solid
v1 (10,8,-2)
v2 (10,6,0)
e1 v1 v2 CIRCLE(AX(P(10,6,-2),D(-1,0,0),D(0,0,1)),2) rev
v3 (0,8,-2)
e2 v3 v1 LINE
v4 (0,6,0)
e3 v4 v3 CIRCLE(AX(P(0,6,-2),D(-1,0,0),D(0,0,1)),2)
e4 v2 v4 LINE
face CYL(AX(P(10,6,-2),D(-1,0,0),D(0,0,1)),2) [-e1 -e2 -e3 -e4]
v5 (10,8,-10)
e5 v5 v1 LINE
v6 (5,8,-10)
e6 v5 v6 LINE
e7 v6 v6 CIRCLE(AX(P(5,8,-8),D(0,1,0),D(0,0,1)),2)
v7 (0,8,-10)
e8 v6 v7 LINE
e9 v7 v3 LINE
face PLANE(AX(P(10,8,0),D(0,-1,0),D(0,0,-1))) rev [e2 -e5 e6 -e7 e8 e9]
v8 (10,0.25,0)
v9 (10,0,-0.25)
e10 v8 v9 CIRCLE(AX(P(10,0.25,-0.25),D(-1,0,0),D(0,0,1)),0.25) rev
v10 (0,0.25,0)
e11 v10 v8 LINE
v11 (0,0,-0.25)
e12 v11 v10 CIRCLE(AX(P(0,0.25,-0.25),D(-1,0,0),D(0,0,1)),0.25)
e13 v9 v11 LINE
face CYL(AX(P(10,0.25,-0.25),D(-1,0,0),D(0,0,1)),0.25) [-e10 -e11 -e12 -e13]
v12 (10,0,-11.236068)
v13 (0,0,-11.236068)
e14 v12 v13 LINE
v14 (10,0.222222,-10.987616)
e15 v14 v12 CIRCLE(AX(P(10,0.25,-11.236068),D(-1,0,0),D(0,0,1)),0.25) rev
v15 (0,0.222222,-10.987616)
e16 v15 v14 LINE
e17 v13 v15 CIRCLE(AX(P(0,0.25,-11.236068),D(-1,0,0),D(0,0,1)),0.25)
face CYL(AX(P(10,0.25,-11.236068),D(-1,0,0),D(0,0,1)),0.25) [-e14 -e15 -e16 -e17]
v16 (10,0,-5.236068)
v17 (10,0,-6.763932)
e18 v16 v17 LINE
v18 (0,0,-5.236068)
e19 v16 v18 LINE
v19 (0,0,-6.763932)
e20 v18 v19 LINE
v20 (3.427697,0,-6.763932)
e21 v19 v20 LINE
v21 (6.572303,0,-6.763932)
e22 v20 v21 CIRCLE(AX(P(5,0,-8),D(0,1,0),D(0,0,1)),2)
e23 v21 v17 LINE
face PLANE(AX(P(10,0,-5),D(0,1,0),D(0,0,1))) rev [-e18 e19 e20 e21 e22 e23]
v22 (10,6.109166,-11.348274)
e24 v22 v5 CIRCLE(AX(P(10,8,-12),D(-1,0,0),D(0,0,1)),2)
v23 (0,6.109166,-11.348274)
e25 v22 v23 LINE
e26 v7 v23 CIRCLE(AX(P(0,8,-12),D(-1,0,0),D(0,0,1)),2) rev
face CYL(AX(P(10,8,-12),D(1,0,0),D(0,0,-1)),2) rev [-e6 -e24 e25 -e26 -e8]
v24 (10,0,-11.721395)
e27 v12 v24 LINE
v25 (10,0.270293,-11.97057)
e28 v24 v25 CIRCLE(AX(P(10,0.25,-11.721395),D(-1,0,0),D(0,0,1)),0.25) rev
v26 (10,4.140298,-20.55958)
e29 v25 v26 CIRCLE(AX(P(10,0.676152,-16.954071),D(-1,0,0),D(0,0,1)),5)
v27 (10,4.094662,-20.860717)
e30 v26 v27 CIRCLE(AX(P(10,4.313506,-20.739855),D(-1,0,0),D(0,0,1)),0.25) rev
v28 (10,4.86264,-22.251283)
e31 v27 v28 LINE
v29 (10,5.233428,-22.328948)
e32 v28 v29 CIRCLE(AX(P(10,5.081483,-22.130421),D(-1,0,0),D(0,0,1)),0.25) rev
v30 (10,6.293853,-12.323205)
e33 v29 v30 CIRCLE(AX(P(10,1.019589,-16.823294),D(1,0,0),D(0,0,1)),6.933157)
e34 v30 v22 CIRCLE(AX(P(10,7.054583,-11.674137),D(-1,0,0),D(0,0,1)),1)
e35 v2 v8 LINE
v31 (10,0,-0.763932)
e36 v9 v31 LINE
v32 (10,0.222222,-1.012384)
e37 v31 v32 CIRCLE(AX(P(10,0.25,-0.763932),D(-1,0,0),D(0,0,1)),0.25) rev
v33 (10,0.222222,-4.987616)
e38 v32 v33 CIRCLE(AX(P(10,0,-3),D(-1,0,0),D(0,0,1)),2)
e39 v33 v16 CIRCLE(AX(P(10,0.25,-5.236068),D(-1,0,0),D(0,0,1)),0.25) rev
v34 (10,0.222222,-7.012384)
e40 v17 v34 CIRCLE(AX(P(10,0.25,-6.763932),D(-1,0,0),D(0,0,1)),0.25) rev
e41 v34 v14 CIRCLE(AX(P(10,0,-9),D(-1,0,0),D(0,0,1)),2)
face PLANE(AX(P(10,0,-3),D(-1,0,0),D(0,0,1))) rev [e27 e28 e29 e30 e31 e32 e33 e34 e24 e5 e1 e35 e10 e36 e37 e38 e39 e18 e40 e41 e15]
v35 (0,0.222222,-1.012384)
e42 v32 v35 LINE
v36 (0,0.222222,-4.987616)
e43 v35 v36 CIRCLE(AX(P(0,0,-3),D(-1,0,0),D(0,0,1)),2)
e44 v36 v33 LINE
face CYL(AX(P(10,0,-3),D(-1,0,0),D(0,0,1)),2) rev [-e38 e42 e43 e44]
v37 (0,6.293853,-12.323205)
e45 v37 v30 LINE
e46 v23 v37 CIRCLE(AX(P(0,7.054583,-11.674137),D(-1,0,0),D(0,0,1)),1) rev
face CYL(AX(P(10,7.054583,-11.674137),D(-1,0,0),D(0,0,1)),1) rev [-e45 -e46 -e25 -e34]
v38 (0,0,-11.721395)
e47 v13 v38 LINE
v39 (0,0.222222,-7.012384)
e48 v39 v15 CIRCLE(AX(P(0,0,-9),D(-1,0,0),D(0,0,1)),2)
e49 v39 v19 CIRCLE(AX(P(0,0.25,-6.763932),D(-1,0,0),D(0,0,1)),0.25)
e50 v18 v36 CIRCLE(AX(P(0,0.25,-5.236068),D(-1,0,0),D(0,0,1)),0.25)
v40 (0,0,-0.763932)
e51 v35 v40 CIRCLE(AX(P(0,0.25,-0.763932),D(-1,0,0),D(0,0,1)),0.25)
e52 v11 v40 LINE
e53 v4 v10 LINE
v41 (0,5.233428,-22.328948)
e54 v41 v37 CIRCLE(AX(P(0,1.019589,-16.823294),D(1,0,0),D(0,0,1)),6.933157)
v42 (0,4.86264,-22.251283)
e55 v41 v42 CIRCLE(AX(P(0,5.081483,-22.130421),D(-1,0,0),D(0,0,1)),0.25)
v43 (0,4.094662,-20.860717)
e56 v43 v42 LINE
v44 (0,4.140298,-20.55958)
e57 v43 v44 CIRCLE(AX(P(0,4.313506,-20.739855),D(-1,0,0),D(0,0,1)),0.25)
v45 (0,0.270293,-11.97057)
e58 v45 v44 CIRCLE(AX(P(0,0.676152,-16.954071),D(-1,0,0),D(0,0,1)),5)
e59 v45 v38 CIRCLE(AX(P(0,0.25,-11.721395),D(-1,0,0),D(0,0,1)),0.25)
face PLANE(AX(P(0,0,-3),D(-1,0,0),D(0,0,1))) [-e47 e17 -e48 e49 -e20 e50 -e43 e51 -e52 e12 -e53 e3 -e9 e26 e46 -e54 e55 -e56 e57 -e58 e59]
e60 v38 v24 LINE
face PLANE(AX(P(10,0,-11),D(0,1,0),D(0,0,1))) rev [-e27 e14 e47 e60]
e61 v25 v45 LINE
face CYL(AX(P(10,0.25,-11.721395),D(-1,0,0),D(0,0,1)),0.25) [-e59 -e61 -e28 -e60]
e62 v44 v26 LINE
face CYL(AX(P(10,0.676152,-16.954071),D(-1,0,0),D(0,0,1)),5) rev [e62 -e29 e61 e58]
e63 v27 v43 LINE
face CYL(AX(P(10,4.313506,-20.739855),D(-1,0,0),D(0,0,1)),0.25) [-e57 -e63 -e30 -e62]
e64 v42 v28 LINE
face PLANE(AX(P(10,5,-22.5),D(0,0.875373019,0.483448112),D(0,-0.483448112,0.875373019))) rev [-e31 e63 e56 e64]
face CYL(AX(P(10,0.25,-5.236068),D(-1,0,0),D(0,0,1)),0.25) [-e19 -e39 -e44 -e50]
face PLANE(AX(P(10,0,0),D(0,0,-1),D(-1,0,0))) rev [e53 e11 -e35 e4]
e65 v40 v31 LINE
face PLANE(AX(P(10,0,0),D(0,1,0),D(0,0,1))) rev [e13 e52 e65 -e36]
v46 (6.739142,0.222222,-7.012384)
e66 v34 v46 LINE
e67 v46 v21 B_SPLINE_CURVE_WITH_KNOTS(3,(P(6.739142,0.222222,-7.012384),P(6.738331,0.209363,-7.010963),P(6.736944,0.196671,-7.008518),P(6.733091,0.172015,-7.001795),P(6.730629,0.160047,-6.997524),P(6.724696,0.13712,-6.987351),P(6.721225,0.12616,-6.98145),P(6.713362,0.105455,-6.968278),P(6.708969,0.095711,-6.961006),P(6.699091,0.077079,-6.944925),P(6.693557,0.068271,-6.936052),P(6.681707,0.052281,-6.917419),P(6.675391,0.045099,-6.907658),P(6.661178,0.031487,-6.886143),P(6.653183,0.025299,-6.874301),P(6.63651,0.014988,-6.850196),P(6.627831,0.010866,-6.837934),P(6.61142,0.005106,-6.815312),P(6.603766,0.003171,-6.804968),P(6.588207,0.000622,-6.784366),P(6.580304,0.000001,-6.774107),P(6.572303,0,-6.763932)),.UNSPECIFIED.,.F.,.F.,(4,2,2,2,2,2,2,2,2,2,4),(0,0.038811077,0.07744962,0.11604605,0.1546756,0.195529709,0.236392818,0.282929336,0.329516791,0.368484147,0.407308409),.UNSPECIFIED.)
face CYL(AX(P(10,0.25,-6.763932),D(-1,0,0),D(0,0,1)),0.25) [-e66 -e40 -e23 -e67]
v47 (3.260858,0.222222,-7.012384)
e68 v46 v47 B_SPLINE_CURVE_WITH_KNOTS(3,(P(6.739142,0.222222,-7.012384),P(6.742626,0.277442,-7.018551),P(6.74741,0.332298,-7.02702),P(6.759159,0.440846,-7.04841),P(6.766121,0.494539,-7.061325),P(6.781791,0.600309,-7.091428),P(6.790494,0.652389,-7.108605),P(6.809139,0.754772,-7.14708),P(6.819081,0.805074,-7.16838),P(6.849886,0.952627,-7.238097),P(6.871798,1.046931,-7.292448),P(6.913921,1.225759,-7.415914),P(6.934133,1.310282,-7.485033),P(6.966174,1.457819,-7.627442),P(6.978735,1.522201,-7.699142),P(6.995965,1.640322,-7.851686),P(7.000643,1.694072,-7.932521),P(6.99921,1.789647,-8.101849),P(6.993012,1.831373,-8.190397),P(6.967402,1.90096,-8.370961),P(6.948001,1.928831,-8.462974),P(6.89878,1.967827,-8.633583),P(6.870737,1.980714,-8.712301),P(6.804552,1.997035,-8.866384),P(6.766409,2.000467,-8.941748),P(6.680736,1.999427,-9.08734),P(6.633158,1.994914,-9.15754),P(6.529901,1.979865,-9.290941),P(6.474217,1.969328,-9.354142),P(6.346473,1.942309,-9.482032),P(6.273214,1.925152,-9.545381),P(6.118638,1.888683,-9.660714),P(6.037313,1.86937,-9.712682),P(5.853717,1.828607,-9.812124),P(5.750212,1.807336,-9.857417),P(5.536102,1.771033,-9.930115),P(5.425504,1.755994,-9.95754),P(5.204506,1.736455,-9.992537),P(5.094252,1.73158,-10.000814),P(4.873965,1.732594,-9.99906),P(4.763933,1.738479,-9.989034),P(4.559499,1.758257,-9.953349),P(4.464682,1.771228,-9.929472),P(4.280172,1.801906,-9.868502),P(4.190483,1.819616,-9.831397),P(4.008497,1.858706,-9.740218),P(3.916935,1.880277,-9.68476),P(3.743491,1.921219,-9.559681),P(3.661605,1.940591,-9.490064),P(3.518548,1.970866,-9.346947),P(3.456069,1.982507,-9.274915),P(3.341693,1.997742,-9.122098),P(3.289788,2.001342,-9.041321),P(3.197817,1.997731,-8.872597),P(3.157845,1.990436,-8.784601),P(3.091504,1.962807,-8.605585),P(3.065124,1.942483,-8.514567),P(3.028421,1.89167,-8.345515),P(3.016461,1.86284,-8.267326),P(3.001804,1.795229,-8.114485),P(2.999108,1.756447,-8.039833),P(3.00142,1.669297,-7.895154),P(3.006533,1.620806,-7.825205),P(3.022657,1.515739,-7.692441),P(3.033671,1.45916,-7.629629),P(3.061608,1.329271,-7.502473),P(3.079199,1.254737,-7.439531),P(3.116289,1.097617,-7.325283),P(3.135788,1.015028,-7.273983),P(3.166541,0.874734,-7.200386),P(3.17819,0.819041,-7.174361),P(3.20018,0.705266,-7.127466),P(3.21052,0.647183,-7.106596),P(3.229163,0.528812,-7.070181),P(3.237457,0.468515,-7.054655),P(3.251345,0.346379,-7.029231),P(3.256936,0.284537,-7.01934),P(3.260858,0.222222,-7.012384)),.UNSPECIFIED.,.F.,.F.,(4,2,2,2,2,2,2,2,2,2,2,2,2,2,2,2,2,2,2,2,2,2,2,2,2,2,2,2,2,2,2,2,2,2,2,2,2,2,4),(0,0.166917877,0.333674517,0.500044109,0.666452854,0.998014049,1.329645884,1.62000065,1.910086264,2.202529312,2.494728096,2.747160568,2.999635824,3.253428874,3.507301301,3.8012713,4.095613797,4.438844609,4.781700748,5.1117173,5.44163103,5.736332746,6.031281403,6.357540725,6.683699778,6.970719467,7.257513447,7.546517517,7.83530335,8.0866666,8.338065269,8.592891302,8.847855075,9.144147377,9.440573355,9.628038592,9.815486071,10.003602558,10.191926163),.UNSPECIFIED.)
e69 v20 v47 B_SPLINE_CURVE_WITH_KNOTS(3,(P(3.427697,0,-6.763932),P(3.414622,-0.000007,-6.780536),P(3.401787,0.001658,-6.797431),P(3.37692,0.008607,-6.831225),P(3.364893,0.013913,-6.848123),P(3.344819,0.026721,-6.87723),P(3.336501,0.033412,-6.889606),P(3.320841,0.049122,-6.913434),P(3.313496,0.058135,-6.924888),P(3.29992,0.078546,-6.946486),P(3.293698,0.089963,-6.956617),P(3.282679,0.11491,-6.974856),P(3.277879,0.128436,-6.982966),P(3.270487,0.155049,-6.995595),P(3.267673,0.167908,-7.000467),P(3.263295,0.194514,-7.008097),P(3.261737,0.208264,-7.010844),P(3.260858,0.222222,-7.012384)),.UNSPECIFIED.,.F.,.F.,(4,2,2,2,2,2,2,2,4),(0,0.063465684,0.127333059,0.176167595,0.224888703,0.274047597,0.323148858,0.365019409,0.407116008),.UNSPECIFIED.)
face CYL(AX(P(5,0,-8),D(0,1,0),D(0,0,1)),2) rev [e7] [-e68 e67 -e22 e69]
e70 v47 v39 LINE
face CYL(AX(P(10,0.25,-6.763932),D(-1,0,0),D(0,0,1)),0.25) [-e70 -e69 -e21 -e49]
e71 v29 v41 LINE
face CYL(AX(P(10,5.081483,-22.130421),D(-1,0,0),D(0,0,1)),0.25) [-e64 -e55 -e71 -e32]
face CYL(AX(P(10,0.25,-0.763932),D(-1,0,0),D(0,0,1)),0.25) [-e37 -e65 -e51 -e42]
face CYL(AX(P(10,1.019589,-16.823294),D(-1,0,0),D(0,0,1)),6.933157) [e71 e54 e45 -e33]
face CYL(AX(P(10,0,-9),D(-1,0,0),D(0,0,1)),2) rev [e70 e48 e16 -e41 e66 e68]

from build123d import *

# Parameters (mm, degrees)
BOSS_EXTRUDE1_DEPTH = 10
FILLET1_START       = -1
FILLET1_DEPTH       = 12
FILLET1_2_DEPTH     = 10
FILLET2_R           = 1
FILLET3_R           = 0.25
SKETCH2_R           = 2
CUT_EXTRUDE1_DEPTH  = 26.785330572


with BuildPart() as part:
    # Sketch1 → Boss-Extrude1 (new body)
    with BuildSketch(Plane(origin=(0, 0, 0), x_dir=(0, 0, -1), z_dir=(1, 0, 0))):
        with BuildLine():
            Line((0, 0), (0, 8))
            Line((0, 8), (10, 8))
            Line((10, 8), (10, 6))
            Line((10, 6), (12, 6))
            ThreePointArc((12, 6), (17.480620462, 7.92151485), (22.5, 5))
            Line((22.5, 5), (20.689313396, 4))
            ThreePointArc((20.689313396, 4), (14.863284967, 5.218025808), (12, 0))
            Line((12, 0), (11, 0))
            ThreePointArc((11, 0), (9, 2), (7, 0))
            Line((7, 0), (5, 0))
            ThreePointArc((5, 0), (3, 2), (1, 0))
            Line((1, 0), (0, 0))
        make_face()
    extrude(amount=BOSS_EXTRUDE1_DEPTH)

    # Fillet1: read off the stored shape, not the designer's step
    # Fillet1 outline → Fillet1 (cut)
    with BuildSketch(Plane.YZ.offset(FILLET1_START)):
        with BuildLine():
            ThreePointArc((6, 0), (7.414213562, -0.585786438), (8, -2))
            Line((8, -2), (8, 0))
            Line((8, 0), (6, 0))
        make_face()
    extrude(amount=FILLET1_DEPTH, mode=Mode.SUBTRACT)

    # Fillet1 2 outline → Fillet1 2 (add)
    with BuildSketch(Plane.YZ):
        with BuildLine():
            ThreePointArc((6, -12), (6.585786438, -10.585786438), (8, -10))
            Line((8, -10), (6, -10))
            Line((6, -10), (6, -12))
        make_face()
    extrude(amount=FILLET1_2_DEPTH)

    # Fillet2
    fillet2_edges = [part.edges().sort_by_distance(p)[0] for p in [
        (5, 6, -12),
    ]]
    fillet(fillet2_edges, radius=FILLET2_R)

    # Fillet3
    fillet3_edges = [part.edges().sort_by_distance(p)[0] for p in [
        (5, 0, 0),
        (5, 5, -22.5),
        (5, 4, -20.689313396),
        (5, 0, -12),
        (5, 0, -11),
        (5, 0, -7),
        (5, 0, -5),
        (5, 0, -1),
    ]]
    fillet(fillet3_edges, radius=FILLET3_R)

    # Sketch2 → Cut-Extrude1 (cut, through all)
    with BuildSketch(Plane(origin=(0, 8, 0), x_dir=(1, 0, 0), z_dir=(0, 1, 0))):
        with Locations(Location((5, 8, 0), (0, 0, 321.827292373))):
            Circle(SKETCH2_R)
    extrude(amount=-CUT_EXTRUDE1_DEPTH, mode=Mode.SUBTRACT)


solid = part.part
